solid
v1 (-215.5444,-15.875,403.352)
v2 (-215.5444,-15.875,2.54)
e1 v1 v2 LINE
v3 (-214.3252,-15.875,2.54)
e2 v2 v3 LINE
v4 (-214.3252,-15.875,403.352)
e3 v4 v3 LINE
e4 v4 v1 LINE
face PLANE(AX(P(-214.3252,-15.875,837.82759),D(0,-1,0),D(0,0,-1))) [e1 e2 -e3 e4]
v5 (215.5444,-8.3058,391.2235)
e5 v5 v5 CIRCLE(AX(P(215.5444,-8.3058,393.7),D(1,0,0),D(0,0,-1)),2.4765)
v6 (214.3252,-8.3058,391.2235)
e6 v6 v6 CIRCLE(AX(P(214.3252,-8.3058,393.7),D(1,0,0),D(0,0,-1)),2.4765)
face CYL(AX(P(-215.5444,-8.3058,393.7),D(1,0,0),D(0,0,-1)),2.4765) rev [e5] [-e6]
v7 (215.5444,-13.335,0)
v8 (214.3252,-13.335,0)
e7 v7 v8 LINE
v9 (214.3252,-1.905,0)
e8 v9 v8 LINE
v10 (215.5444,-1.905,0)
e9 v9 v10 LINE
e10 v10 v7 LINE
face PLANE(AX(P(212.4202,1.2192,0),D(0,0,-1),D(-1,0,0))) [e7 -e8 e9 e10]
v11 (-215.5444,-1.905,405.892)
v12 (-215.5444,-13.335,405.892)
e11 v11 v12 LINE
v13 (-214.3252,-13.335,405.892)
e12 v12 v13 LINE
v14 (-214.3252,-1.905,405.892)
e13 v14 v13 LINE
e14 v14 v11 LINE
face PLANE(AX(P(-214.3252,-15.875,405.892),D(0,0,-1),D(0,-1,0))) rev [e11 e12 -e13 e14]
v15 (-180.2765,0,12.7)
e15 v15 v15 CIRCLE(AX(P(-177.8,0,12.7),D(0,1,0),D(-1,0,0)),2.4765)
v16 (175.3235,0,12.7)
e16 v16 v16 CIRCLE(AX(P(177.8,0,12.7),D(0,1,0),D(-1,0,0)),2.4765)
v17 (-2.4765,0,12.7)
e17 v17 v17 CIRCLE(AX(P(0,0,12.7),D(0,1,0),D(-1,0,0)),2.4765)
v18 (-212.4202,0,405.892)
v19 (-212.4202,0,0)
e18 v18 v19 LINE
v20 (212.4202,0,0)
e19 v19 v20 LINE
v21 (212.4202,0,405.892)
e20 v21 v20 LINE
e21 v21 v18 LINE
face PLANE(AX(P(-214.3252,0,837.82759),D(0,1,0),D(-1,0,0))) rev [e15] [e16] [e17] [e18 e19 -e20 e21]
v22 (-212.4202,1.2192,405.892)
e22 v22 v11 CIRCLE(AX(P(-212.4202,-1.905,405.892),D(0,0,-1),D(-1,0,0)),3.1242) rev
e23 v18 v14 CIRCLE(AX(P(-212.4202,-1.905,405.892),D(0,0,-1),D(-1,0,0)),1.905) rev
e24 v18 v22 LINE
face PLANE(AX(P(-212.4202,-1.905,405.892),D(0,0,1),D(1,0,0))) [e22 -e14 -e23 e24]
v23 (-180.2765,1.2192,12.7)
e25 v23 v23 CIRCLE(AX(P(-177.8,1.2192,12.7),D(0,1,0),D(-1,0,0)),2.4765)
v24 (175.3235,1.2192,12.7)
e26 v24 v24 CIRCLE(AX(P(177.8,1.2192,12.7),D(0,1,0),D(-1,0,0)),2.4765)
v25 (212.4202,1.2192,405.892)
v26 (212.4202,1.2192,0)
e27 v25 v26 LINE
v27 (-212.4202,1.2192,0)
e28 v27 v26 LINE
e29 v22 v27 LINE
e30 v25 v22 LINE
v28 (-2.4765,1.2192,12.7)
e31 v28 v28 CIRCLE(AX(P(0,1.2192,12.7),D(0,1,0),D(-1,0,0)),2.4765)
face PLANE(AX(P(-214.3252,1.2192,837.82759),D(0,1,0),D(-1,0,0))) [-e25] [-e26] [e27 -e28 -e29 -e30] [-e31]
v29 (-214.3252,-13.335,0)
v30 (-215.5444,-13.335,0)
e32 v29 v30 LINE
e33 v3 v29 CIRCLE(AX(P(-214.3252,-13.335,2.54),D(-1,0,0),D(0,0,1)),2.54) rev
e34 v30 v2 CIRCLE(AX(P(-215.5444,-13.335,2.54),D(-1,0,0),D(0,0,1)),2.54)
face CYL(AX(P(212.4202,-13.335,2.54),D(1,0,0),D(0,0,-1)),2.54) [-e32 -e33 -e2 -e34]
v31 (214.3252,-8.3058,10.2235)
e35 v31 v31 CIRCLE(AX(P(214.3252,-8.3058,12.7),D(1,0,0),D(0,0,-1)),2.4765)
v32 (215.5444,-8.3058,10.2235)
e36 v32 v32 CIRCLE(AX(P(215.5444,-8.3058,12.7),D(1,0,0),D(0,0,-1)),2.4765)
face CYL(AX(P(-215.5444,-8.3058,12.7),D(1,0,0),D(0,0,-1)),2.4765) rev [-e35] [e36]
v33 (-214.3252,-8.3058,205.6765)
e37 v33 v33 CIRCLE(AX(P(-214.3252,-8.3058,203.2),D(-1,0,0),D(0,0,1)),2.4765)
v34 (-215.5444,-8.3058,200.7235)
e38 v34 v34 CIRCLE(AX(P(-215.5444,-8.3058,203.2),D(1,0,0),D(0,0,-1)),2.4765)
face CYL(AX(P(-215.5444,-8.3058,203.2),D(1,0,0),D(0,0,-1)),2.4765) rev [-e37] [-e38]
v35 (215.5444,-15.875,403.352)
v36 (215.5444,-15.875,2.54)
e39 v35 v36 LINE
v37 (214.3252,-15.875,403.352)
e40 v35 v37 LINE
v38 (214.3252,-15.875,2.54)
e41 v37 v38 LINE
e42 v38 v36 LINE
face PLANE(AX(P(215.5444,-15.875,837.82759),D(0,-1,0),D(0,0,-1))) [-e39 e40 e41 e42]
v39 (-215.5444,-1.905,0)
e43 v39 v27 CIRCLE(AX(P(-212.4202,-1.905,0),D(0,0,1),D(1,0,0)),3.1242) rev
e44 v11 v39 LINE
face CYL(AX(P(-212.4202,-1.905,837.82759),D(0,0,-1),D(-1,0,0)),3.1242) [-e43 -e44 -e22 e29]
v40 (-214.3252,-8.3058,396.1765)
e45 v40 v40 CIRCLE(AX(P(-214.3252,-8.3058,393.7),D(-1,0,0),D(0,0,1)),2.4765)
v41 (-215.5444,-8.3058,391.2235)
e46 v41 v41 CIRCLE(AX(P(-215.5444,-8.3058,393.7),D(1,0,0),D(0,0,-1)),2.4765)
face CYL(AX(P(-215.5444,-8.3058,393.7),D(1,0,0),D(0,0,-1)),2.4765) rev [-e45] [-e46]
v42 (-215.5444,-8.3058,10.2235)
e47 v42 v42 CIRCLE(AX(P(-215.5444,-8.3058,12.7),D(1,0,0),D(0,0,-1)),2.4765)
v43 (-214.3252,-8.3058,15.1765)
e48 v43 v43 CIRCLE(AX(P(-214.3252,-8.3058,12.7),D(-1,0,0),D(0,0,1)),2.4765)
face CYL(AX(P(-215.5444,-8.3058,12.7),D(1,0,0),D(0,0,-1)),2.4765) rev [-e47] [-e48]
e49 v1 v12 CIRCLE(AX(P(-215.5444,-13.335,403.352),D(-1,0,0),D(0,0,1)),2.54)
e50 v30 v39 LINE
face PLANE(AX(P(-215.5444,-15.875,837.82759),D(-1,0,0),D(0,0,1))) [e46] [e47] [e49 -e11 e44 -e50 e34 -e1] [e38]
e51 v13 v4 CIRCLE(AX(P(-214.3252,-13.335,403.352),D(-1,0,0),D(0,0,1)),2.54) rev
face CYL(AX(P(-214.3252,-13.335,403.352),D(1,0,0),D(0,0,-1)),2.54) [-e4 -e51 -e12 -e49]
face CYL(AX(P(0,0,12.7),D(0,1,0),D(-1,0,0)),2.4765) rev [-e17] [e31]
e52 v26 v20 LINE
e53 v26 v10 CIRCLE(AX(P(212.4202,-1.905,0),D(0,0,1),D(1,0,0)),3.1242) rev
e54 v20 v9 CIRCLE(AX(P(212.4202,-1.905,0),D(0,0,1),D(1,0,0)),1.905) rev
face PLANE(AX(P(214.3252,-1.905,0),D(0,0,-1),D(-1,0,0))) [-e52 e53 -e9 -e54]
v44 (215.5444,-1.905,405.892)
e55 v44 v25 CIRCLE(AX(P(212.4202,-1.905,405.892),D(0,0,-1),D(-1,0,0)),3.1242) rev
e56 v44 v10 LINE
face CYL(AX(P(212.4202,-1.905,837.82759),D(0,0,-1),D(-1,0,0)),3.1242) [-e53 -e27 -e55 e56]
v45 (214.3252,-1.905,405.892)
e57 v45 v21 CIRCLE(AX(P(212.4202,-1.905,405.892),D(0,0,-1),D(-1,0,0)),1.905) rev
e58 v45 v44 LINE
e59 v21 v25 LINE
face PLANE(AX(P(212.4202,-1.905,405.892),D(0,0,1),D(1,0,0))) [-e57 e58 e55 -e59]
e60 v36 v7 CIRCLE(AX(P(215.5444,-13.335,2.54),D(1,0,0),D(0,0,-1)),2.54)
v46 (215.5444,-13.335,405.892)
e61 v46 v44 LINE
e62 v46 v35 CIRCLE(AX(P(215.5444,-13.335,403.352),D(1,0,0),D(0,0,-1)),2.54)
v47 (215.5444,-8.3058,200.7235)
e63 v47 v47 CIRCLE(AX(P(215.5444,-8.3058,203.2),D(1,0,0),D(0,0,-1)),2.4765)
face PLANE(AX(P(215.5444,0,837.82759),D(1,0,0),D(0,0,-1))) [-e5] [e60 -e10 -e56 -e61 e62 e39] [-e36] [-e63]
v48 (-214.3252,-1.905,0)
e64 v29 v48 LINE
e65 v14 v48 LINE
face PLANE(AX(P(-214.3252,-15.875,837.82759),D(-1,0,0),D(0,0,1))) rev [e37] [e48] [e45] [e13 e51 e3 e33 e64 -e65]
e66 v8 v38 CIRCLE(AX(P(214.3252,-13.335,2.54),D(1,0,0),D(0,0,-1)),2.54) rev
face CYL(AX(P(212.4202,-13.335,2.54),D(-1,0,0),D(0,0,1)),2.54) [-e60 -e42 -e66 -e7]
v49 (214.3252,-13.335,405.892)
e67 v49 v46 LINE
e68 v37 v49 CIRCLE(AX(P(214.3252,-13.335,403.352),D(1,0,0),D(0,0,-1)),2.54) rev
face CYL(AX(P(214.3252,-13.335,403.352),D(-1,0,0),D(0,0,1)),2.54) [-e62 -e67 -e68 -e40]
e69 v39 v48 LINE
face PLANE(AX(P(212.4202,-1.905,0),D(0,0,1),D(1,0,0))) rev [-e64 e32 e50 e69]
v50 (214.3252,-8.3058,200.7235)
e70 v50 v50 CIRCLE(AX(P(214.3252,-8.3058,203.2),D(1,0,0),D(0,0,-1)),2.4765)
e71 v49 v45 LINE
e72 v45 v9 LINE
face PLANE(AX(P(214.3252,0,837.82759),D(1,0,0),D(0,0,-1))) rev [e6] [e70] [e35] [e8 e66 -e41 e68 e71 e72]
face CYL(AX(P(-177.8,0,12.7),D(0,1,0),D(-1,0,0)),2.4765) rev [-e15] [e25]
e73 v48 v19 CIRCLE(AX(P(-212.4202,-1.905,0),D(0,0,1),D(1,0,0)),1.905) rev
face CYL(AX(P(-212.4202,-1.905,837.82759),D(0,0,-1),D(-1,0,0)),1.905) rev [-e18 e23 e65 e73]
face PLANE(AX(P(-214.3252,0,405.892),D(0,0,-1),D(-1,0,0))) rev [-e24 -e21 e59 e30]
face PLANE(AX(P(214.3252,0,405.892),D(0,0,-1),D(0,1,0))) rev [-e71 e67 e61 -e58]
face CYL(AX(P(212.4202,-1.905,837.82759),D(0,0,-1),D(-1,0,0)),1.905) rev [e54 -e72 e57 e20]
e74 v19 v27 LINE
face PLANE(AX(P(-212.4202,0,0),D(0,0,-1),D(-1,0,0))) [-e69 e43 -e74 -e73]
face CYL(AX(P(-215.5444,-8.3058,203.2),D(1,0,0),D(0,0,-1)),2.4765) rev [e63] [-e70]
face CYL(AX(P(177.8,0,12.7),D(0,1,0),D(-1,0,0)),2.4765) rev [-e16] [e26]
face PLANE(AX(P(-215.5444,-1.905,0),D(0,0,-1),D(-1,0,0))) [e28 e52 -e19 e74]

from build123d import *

# Parameters (mm, degrees)
BASE_FLANGE1_DEPTH = 405.892
FILLET1_R          = 2.54
SKETCH3_R          = 2.4765
CUT_EXTRUDE1_DEPTH = 593.315696883
SKETCH4_R          = 2.4765
CUT_EXTRUDE2_DEPTH = 1.2192


# Sheet-metal steps are written as plain solids
with BuildPart() as part:
    # Sketch1 → Base-Flange1 (new body)
    with BuildSketch(Plane.XY):
        with BuildLine():
            Line((-214.3252, -15.875), (-214.3252, -1.905))
            ThreePointArc((-214.3252, -1.905), (-213.767238418, -0.557961582), (-212.4202, 0))
            Line((-212.4202, 0), (212.4202, 0))
            ThreePointArc((212.4202, 0), (213.767238418, -0.557961582), (214.3252, -1.905))
            Line((214.3252, -1.905), (214.3252, -15.875))
            Line((214.3252, -15.875), (215.5444, -15.875))
            Line((215.5444, -15.875), (215.5444, -1.905))
            ThreePointArc((215.5444, -1.905), (214.629343006, 0.304143006), (212.4202, 1.2192))
            Line((212.4202, 1.2192), (-212.4202, 1.2192))
            ThreePointArc((-212.4202, 1.2192), (-214.629343006, 0.304143006), (-215.5444, -1.905))
            Line((-215.5444, -1.905), (-215.5444, -15.875))
            Line((-215.5444, -15.875), (-214.3252, -15.875))
        make_face()
    extrude(amount=BASE_FLANGE1_DEPTH)

    # Fillet1
    fillet1_edges = [part.edges().sort_by_distance(p)[0] for p in [
        (214.9348, -15.875, 0),
        (214.9348, -15.875, 405.892),
        (-214.9348, -15.875, 405.892),
        (-214.9348, -15.875, 0),
    ]]
    fillet(fillet1_edges, radius=FILLET1_R)

    # Sketch3 → Cut-Extrude1 (cut, through all)
    with BuildSketch(Plane(origin=(215.5444, 0, 0), x_dir=(0, 0, -1), z_dir=(1, 0, 0))):
        with Locations((-393.7, -8.305800148)):
            Circle(SKETCH3_R)
        with Locations((-203.2, -8.305800148)):
            Circle(SKETCH3_R)
        with Locations((-12.7, -8.305800148)):
            Circle(SKETCH3_R)
    extrude(amount=-CUT_EXTRUDE1_DEPTH, mode=Mode.SUBTRACT)

    # Sketch4 → Cut-Extrude2 (cut)
    with BuildSketch(Plane(origin=(0, 1.2192, 0), x_dir=(1, 0, 0), z_dir=(0, 1, 0))):
        with Locations(Location((-177.8, -12.7, 0), (0, 0, 180))):
            Circle(SKETCH4_R)
        with Locations(Location((0, -12.7, 0), (0, 0, 180))):
            Circle(SKETCH4_R)
        with Locations(Location((177.8, -12.7, 0), (0, 0, 180))):
            Circle(SKETCH4_R)
    extrude(amount=-CUT_EXTRUDE2_DEPTH, mode=Mode.SUBTRACT)


solid = part.part
